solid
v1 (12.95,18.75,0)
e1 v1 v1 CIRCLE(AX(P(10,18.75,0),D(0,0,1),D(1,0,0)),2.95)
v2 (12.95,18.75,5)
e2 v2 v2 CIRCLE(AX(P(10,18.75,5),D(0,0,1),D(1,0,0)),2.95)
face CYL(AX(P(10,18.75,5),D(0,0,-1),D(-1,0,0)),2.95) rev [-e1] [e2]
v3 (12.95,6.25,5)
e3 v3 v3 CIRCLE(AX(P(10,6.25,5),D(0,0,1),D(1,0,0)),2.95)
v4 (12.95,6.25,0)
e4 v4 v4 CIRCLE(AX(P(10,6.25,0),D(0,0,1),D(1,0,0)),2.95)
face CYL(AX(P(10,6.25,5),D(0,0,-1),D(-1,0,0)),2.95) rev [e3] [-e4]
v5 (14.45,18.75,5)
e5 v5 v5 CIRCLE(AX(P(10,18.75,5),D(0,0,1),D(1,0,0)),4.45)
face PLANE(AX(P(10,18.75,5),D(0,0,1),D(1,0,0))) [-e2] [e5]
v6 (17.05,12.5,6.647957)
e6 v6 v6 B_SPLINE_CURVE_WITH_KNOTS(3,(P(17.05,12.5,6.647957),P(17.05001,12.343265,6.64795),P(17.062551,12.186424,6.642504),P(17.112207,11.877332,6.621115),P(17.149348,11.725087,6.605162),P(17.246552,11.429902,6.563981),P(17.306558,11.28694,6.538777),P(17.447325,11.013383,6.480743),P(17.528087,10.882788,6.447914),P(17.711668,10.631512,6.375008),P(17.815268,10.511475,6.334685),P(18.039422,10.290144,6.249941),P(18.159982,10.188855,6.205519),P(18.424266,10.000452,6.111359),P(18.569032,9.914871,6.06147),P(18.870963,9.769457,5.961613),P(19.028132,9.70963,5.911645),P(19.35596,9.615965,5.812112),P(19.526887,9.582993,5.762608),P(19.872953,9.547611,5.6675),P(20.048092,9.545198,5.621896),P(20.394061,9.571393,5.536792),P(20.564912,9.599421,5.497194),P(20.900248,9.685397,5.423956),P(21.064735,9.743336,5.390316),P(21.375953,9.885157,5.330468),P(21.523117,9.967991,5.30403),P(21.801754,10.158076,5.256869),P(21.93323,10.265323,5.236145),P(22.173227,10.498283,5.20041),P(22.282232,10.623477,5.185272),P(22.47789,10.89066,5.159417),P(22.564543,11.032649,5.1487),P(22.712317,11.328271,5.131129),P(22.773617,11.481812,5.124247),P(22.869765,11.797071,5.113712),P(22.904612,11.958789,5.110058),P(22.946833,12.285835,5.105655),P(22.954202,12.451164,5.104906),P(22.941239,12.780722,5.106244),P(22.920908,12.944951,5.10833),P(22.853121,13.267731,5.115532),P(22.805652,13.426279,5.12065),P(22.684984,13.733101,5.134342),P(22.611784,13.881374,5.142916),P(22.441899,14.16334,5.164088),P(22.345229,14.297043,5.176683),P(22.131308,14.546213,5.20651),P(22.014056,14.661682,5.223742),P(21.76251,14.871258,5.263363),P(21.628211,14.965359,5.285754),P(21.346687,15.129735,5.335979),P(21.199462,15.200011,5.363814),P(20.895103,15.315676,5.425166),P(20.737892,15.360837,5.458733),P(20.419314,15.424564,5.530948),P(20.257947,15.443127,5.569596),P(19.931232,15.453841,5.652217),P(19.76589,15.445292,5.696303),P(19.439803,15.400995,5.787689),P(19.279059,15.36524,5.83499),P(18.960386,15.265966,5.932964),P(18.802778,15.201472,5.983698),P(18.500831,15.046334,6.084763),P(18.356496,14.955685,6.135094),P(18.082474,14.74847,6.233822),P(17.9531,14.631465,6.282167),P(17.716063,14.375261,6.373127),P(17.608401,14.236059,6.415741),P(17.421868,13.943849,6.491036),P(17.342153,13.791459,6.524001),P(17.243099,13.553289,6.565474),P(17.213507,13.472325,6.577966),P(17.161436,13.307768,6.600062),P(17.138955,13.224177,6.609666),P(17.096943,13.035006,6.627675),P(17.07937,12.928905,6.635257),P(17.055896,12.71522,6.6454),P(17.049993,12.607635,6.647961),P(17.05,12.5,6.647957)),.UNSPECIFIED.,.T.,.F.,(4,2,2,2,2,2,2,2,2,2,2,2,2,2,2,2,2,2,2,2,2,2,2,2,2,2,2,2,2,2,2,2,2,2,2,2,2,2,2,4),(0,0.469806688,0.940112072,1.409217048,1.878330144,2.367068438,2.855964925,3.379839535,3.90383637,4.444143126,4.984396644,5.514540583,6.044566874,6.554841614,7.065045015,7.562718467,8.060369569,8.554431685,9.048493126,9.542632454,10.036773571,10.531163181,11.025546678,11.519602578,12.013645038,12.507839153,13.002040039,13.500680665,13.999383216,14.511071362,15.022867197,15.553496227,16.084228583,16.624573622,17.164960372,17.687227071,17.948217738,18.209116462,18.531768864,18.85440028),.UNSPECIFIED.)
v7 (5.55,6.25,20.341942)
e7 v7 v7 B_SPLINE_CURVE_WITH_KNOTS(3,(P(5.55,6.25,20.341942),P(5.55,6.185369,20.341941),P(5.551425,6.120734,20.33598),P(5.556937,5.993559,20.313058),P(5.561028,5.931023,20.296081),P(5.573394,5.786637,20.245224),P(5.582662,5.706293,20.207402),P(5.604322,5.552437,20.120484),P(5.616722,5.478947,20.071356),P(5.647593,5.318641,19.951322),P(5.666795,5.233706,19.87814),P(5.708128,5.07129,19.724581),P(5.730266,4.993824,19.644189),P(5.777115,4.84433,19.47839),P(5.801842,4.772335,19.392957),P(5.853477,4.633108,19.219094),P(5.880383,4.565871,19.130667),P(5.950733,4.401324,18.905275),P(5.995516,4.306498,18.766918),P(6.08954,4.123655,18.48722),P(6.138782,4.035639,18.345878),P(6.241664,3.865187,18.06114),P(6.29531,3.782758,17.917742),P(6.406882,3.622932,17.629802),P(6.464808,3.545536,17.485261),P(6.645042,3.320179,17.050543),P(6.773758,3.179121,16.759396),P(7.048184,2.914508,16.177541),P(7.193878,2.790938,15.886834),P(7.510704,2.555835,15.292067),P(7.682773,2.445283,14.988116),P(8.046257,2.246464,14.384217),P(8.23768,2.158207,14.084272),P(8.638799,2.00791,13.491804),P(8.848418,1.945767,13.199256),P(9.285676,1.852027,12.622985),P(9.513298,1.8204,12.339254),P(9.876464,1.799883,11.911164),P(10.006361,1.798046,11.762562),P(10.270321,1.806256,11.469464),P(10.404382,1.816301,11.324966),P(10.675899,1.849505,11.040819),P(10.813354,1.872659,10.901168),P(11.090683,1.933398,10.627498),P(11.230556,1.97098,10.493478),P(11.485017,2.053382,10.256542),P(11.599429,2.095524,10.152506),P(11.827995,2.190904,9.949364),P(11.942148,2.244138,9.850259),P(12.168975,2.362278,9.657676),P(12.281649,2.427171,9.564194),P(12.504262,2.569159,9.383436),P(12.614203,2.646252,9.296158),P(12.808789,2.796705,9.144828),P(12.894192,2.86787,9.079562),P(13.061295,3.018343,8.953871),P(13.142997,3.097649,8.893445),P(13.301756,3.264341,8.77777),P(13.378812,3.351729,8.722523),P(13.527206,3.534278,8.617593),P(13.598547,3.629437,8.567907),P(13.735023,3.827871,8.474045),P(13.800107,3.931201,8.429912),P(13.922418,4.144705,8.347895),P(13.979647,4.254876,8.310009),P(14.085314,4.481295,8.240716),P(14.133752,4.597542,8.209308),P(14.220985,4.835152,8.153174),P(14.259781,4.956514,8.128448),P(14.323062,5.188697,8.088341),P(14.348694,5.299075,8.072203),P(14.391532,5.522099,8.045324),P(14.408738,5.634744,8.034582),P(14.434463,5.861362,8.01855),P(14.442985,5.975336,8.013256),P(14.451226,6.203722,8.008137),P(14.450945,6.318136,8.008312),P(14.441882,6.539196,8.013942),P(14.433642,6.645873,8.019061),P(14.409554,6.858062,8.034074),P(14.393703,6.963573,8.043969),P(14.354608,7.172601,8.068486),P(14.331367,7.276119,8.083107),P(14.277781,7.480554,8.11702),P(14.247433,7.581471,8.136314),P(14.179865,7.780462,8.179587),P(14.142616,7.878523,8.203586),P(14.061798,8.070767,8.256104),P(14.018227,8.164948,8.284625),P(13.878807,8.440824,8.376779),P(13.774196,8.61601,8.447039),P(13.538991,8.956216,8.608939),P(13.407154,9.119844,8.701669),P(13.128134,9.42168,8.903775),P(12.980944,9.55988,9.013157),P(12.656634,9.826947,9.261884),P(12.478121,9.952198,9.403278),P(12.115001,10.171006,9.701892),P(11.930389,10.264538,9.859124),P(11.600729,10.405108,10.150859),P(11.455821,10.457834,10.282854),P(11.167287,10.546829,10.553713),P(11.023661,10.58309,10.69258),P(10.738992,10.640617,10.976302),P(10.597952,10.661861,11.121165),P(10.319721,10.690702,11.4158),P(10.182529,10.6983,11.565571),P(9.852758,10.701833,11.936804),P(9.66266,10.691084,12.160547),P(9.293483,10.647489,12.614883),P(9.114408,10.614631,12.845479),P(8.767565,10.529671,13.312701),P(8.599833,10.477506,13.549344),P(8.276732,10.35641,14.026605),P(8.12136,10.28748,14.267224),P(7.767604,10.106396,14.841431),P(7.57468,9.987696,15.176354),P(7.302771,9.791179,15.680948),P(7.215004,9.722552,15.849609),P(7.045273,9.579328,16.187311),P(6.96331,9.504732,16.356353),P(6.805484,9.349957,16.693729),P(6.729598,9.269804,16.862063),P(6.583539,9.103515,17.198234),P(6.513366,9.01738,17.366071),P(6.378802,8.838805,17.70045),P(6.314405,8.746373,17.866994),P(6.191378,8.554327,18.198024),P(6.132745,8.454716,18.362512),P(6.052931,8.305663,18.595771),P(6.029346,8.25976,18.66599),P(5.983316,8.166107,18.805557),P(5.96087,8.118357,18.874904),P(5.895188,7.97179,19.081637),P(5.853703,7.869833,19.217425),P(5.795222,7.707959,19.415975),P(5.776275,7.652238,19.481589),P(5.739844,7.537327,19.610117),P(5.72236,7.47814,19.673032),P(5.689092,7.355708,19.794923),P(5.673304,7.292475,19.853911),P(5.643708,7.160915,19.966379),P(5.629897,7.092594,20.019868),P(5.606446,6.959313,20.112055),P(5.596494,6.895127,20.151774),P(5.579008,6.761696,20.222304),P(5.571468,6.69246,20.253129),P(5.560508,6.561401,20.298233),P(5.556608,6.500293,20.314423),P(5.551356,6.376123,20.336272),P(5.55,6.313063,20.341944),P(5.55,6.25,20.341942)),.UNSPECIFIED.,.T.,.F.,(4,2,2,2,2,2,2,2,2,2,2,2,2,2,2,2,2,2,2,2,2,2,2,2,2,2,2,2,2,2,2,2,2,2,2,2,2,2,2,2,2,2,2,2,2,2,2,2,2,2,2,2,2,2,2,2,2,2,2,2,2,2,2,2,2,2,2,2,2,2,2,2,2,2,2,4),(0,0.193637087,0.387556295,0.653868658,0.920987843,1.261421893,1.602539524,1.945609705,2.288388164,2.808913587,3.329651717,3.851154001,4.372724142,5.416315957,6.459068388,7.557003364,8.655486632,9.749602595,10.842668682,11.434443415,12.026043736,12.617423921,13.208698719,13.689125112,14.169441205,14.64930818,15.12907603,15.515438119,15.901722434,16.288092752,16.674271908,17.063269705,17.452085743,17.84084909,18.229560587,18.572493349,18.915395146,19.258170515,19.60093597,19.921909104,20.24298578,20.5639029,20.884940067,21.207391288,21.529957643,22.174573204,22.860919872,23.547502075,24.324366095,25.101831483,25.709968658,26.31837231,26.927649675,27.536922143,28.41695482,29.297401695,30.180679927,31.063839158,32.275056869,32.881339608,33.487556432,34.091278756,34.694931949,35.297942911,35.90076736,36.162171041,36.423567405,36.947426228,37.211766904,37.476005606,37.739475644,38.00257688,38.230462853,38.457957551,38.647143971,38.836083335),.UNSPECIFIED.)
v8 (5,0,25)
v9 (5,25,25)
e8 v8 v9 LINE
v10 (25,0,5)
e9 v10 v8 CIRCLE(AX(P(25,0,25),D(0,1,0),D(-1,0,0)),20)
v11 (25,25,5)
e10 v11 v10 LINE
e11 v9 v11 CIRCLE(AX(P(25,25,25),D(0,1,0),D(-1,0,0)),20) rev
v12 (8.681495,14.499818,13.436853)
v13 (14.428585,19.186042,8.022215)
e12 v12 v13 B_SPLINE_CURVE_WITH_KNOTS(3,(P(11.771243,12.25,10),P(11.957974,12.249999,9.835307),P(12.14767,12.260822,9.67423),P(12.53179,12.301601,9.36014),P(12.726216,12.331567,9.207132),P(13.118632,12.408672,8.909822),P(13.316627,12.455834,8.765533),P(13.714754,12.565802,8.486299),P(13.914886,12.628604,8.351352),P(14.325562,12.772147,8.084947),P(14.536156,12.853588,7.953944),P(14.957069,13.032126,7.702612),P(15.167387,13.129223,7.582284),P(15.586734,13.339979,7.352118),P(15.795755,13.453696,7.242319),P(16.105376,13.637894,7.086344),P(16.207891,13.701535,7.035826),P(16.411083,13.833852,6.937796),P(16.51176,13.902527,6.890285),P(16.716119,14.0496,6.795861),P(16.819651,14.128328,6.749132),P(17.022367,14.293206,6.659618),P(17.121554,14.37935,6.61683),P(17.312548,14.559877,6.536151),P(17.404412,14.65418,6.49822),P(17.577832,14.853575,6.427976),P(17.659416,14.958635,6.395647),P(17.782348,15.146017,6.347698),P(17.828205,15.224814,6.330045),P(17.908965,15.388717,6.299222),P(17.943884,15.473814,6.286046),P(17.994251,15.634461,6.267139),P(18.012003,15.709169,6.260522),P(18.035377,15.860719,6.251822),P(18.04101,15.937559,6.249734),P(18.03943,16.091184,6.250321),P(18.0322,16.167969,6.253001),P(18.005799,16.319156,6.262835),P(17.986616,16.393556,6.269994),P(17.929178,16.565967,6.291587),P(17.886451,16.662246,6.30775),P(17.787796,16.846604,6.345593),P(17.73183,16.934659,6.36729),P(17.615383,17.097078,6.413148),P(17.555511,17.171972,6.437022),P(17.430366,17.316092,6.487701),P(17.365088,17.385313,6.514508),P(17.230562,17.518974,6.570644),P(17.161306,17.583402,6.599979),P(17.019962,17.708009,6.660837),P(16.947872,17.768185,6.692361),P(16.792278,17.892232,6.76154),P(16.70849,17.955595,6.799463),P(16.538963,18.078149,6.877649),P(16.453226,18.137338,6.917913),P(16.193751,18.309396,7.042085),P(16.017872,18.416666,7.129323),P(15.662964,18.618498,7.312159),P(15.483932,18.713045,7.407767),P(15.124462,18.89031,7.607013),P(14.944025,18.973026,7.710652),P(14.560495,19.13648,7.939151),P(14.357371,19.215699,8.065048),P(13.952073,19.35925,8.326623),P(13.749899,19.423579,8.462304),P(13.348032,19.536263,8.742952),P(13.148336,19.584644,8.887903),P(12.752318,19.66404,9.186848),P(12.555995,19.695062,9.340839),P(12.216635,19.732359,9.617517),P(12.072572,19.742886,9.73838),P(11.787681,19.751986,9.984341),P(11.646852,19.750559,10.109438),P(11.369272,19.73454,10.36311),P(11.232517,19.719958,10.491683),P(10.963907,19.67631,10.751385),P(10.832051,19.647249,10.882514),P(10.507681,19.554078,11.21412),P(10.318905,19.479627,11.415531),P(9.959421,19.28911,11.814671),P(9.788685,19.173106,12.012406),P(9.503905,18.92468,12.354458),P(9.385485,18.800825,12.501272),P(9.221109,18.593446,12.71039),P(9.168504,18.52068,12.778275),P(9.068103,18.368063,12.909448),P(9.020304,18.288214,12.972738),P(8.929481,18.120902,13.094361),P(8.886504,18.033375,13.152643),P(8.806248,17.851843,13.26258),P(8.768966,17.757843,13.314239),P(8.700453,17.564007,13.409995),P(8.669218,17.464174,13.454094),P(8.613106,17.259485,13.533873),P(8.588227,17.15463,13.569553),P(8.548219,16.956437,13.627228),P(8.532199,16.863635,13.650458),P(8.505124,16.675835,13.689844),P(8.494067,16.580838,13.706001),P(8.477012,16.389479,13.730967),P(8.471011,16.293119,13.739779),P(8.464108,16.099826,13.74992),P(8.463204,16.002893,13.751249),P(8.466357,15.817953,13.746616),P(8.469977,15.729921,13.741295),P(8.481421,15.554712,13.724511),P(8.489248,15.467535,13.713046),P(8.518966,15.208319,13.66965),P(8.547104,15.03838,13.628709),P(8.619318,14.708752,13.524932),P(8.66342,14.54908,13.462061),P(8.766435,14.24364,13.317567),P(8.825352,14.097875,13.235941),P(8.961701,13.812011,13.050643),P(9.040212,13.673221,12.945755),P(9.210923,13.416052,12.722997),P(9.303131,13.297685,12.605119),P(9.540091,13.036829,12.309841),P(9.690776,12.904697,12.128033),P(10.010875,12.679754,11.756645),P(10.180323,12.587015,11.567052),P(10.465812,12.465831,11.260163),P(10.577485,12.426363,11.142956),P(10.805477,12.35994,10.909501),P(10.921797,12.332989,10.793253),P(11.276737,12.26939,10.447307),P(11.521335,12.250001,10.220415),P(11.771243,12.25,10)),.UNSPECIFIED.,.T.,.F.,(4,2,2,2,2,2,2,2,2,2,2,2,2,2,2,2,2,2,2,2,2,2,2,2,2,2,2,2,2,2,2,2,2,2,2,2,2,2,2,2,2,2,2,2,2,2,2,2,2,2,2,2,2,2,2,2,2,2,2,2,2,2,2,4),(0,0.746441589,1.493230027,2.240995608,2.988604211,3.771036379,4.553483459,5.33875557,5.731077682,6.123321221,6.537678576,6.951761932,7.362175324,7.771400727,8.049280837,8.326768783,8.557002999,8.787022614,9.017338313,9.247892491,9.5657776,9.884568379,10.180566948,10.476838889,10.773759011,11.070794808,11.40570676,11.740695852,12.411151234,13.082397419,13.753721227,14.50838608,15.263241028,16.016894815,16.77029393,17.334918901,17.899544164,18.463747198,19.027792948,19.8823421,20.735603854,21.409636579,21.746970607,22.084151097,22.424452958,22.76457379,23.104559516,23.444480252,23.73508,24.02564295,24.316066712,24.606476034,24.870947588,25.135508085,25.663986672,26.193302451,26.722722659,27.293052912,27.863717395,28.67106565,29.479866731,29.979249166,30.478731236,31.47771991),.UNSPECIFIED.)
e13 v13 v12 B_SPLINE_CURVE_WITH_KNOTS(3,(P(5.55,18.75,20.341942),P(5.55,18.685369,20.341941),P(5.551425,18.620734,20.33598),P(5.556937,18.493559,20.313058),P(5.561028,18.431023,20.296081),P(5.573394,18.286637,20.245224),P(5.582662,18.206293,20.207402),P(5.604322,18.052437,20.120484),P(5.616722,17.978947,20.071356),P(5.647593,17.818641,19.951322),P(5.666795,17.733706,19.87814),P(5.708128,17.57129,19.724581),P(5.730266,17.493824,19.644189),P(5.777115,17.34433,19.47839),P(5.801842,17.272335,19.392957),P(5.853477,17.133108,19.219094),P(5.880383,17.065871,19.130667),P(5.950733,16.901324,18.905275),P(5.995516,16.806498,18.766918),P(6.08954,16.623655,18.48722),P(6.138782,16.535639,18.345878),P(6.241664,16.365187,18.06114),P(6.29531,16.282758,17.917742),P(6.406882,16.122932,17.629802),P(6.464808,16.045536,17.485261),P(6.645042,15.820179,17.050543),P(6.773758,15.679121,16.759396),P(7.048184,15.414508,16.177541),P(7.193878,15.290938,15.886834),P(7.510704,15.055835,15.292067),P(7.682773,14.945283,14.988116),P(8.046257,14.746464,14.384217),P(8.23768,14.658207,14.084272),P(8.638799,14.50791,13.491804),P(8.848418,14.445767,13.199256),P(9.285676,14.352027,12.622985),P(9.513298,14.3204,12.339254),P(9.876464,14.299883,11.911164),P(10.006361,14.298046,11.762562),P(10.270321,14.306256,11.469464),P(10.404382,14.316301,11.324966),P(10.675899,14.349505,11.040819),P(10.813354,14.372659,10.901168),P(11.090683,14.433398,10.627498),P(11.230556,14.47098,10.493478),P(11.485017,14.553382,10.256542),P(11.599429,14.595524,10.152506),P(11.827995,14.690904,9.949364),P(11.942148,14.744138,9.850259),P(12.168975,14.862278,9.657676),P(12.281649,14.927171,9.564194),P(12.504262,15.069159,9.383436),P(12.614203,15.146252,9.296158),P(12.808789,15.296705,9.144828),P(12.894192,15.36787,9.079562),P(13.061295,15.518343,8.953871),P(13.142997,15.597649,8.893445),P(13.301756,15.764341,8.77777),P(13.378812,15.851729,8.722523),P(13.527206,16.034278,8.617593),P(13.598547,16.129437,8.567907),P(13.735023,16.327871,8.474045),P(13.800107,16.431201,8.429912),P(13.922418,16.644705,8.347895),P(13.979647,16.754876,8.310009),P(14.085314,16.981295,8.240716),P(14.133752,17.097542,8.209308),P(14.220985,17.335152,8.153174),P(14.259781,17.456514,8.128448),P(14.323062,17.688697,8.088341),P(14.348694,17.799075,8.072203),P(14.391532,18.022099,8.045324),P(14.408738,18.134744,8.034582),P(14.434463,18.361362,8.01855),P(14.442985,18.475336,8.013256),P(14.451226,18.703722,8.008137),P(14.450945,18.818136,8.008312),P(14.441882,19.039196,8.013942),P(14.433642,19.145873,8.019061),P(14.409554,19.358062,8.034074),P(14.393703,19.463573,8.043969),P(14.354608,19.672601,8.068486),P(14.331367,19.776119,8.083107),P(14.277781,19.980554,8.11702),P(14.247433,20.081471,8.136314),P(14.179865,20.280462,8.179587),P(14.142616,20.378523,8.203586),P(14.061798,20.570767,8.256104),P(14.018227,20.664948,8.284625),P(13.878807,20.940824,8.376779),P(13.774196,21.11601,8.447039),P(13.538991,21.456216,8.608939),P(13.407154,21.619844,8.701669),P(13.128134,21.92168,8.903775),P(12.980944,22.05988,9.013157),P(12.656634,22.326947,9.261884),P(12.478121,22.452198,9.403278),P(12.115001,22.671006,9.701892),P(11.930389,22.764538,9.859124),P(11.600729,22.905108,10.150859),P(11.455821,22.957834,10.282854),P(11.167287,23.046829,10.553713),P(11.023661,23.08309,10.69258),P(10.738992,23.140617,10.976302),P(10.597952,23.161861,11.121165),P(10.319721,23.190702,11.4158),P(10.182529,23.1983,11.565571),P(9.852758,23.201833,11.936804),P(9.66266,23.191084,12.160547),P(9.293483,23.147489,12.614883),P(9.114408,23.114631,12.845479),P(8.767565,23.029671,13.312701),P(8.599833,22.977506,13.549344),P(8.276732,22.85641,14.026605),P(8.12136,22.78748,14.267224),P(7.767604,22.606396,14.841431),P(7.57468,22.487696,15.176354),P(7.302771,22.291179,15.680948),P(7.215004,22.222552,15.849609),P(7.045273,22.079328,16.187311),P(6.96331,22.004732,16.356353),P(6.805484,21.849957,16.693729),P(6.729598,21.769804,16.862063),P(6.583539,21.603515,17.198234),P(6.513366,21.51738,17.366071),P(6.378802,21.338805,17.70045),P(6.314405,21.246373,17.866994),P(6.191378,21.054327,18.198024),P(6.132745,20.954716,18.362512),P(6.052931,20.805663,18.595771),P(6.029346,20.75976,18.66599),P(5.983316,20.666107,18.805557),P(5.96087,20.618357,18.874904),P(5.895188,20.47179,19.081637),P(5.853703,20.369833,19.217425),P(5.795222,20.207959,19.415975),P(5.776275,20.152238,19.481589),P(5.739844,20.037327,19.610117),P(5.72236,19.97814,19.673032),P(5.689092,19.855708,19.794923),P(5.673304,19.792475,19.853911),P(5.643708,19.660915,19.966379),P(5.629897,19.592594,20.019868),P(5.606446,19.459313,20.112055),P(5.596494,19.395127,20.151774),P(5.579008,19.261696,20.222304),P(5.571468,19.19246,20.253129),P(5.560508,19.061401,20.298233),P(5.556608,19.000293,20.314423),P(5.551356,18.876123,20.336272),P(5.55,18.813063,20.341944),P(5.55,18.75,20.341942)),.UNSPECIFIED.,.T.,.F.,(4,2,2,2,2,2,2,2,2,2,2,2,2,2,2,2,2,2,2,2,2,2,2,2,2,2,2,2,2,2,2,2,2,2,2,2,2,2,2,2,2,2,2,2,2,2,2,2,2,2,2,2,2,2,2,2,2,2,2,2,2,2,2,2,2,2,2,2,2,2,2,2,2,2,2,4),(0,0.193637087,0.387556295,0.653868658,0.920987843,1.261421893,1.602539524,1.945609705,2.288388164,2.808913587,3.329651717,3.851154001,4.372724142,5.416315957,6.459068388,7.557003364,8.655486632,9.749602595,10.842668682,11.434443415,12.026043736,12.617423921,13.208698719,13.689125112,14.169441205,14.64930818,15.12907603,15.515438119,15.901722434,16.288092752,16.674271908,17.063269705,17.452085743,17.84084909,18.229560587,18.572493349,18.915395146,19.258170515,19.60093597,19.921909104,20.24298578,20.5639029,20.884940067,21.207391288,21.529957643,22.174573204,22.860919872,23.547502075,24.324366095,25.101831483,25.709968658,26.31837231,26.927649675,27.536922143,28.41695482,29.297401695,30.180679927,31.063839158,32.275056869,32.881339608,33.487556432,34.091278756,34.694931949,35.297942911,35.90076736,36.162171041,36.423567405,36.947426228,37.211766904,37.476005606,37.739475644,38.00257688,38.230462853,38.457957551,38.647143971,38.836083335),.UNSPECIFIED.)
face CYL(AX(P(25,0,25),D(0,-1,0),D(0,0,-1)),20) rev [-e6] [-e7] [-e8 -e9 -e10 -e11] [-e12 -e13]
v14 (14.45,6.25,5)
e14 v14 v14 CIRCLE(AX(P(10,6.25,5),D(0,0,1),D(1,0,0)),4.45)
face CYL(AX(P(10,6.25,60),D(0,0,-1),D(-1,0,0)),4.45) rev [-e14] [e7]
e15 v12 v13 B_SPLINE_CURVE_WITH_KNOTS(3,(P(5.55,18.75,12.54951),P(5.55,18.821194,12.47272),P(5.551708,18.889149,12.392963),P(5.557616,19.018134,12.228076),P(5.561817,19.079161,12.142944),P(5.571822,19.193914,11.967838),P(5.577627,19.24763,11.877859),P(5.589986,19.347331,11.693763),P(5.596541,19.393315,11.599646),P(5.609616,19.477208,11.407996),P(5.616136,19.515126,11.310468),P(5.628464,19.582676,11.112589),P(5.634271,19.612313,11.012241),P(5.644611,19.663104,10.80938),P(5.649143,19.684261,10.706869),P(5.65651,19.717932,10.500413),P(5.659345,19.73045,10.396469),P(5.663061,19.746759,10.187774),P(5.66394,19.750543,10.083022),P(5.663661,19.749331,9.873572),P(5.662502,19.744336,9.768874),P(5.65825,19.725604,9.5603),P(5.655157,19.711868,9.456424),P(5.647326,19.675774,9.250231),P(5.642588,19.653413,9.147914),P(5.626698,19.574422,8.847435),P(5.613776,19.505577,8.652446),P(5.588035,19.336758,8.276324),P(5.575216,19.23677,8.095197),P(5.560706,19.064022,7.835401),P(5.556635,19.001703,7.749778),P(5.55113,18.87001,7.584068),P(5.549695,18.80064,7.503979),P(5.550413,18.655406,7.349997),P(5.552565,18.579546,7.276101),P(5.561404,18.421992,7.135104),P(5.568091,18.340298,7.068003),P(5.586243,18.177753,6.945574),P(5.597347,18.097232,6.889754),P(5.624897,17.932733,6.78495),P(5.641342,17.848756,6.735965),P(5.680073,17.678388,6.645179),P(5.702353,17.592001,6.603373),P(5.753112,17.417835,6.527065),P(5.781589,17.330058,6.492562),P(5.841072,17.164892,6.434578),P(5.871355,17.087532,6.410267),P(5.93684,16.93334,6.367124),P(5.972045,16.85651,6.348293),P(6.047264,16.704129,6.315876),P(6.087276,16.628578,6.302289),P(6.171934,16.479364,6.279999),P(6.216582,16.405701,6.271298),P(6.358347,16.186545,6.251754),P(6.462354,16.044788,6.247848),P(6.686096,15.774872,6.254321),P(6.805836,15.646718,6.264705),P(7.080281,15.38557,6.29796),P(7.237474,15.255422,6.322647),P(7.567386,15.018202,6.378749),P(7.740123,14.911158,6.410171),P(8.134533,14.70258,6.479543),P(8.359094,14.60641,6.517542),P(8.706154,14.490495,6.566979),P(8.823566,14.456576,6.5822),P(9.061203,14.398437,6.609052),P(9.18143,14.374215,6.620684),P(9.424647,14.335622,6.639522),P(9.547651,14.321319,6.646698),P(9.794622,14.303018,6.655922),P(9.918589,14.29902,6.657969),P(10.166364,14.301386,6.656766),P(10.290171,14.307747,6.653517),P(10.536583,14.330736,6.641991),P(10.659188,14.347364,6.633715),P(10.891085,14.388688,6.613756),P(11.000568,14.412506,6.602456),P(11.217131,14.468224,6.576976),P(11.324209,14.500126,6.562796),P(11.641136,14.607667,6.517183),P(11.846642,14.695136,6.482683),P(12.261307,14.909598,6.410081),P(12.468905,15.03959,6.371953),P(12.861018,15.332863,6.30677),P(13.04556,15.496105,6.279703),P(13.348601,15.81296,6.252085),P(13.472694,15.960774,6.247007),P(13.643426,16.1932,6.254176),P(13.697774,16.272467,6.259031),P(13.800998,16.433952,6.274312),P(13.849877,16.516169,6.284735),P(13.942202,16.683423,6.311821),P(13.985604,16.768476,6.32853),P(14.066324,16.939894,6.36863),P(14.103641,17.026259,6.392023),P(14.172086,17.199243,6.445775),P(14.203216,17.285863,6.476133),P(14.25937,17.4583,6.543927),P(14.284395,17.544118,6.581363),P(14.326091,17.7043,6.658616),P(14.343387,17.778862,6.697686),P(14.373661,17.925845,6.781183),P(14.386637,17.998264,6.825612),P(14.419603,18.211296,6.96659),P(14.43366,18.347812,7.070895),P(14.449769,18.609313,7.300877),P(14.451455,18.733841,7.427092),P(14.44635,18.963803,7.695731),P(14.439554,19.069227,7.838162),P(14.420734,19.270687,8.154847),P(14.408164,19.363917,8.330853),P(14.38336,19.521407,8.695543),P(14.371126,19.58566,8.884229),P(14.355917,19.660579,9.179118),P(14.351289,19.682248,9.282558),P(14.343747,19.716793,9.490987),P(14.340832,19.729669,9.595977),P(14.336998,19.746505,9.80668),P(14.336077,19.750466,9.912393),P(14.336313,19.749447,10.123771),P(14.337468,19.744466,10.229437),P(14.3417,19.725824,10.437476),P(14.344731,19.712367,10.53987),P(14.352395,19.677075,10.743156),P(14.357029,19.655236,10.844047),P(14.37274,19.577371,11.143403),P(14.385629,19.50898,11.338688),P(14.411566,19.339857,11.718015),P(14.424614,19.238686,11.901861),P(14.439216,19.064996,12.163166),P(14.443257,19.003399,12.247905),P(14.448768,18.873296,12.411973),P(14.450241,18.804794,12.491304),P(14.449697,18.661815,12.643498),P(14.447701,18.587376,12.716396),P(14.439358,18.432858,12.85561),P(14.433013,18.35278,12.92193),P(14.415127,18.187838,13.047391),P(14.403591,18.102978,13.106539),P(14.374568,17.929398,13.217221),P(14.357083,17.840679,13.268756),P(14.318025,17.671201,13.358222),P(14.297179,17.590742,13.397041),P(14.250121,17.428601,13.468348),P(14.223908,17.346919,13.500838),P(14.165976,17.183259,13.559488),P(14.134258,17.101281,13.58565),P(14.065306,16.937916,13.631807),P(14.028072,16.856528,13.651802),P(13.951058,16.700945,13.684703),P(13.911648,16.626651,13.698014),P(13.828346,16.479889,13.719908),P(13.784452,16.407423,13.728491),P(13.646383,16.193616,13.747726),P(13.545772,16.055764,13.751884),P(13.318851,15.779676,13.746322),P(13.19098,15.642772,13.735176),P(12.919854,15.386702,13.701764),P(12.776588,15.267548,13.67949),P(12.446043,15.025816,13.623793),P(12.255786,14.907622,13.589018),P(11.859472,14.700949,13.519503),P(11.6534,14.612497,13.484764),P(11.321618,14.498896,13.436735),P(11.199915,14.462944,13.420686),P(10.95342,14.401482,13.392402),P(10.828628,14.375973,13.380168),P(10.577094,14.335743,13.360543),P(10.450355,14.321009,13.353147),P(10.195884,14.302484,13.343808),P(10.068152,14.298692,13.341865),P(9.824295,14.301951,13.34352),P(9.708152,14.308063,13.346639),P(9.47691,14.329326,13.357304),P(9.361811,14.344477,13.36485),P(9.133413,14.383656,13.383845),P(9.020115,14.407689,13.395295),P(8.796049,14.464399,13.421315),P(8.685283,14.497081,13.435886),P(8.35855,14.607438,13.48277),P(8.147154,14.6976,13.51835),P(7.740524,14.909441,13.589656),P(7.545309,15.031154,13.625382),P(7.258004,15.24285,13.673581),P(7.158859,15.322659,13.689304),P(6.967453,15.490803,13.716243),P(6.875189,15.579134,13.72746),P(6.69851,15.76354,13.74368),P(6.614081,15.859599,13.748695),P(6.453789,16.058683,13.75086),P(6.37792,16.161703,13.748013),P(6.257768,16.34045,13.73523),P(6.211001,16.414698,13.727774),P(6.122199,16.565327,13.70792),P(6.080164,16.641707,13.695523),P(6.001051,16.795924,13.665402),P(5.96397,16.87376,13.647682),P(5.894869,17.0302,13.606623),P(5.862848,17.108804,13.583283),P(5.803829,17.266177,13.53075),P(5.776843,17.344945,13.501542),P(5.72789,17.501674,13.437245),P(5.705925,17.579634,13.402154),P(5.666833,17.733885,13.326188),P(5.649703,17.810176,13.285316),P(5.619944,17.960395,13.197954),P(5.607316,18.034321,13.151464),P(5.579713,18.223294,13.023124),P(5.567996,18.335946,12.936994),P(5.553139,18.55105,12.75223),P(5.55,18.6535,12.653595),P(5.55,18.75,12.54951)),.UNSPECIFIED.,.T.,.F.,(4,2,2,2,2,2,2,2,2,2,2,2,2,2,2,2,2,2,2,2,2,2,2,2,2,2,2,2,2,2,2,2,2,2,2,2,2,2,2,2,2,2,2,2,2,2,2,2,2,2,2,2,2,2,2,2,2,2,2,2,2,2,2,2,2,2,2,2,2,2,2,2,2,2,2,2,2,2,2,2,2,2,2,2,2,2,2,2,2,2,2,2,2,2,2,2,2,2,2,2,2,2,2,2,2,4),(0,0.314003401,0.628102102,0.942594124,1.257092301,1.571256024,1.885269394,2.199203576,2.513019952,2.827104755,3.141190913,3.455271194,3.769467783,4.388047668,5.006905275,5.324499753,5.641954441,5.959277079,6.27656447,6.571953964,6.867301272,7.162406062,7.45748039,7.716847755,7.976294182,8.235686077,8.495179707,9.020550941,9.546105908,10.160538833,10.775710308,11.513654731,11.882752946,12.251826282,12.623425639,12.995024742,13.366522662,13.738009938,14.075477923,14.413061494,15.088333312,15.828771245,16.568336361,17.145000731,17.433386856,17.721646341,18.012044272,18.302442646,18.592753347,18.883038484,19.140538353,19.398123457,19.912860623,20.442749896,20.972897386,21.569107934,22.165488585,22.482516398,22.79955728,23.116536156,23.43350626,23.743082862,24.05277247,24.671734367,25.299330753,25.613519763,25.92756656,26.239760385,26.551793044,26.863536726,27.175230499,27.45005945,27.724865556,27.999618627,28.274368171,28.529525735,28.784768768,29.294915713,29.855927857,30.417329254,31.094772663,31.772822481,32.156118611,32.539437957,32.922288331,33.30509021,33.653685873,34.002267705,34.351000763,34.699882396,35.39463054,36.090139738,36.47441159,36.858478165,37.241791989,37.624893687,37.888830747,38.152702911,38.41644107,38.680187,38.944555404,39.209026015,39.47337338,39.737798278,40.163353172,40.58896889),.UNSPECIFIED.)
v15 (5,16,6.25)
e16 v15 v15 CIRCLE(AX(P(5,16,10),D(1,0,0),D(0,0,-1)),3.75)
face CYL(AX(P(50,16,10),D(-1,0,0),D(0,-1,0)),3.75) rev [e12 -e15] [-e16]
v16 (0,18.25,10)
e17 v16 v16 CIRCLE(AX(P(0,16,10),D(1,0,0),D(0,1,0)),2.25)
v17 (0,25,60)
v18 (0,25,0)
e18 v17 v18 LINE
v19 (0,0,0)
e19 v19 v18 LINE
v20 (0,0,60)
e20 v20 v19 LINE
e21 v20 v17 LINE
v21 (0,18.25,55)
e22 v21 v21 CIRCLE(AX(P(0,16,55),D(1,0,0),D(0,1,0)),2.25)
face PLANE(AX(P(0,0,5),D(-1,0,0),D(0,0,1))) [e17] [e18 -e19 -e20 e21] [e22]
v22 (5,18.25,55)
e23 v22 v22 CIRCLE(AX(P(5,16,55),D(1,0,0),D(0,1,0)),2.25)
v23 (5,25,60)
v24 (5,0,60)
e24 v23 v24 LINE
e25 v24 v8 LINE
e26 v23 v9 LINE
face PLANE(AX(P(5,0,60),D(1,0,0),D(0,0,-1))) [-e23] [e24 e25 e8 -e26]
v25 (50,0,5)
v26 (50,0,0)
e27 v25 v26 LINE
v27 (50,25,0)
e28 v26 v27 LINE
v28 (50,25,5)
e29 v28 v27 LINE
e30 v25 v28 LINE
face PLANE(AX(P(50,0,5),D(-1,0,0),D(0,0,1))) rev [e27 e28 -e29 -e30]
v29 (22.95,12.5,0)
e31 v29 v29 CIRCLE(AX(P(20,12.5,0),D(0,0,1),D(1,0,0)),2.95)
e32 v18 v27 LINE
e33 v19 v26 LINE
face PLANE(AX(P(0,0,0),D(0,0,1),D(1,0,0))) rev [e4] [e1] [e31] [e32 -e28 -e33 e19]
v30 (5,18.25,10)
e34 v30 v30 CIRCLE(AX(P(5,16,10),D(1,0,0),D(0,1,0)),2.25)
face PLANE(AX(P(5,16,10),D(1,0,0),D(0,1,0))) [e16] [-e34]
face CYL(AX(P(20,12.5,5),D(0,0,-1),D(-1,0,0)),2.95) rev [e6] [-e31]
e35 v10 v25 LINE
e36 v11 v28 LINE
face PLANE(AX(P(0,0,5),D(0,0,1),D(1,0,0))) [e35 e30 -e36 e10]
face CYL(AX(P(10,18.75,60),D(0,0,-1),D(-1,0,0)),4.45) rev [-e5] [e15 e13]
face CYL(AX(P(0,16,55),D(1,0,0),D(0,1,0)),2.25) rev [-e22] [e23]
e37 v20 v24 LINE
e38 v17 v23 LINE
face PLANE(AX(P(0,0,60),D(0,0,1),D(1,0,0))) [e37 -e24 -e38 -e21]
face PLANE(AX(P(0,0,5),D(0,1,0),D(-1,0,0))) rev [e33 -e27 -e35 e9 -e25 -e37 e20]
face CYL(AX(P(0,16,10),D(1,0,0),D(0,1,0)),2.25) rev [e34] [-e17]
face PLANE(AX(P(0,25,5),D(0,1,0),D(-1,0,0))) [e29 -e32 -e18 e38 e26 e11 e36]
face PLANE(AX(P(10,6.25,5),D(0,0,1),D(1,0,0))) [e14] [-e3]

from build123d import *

# Parameters (mm, degrees)
CROQUIS1_W                   = 50
CROQUIS1_H                   = 25
CROQUIS1_R                   = 2.95
SALIENTE_EXTRUIR1_DEPTH      = 5
CROQUIS1_3_W                 = 5
CROQUIS1_3_H                 = 25
SALIENTE_EXTRUIR2_DEPTH      = 60
REDONDEO2_DEPTH              = 25
REDONDEO2_START              = 5
REDONDEO2_2_OUTLINE_R        = 2.95
REDONDEO2_2_DEPTH            = 20
CROQUIS4_R                   = 4.45
CORTAR_EXTRUIR1_DEPTH        = 79.421935739
CROQUIS5_R                   = 2.25
CORTAR_EXTRUIR2_DEPTH        = 80.056941536
CROQUIS5_3_R                 = 3.75
CROQUIS5_3_R_2               = 2.25
CORTAR_EXTRUIR_L_MINA3_DEPTH = 80.056941536


with BuildPart() as part:
    # Croquis1 → Saliente-Extruir1 (new body)
    with BuildSketch(Plane.XY):
        with Locations((25, 12.5)):
            Rectangle(CROQUIS1_W, CROQUIS1_H)
        with Locations((10, 18.75)):
            Circle(CROQUIS1_R, mode=Mode.SUBTRACT)
        with Locations((10, 6.25)):
            Circle(CROQUIS1_R, mode=Mode.SUBTRACT)
        with Locations((20, 12.5)):
            Circle(CROQUIS1_R, mode=Mode.SUBTRACT)
    extrude(amount=SALIENTE_EXTRUIR1_DEPTH)

    # Croquis1<3> → Saliente-Extruir2 (add)
    with BuildSketch(Plane.XY):
        with Locations((2.5, 12.5)):
            Rectangle(CROQUIS1_3_W, CROQUIS1_3_H)
    extrude(amount=SALIENTE_EXTRUIR2_DEPTH)

    # Redondeo2: read off the stored shape, not the designer's step
    # Redondeo2 outline → Redondeo2 (add)
    with BuildSketch(Plane(origin=(0, 0, 0), x_dir=(1, 0, 0), z_dir=(0, 1, 0))):
        with BuildLine():
            Line((5, -5), (5, -25))
            ThreePointArc((5, -25), (10.857864376, -10.857864376), (25, -5))
            Line((25, -5), (5, -5))
        make_face()
    extrude(amount=REDONDEO2_DEPTH)

    # Redondeo2 2 outline → Redondeo2 2 (cut)
    with BuildSketch(Plane.XY.offset(REDONDEO2_START)):
        with Locations((10, 18.75)):
            Circle(REDONDEO2_2_OUTLINE_R)
        with Locations((20, 12.5)):
            Circle(REDONDEO2_2_OUTLINE_R)
        with Locations((10, 6.25)):
            Circle(REDONDEO2_2_OUTLINE_R)
    extrude(amount=REDONDEO2_2_DEPTH, mode=Mode.SUBTRACT)

    # Croquis4 → Cortar-Extruir1 (cut, through all)
    with BuildSketch(Plane.XY.offset(5)):
        with Locations(Location((10, 18.75, 0), (0, 0, 180))):
            Circle(CROQUIS4_R)
        with Locations(Location((10, 6.25, 0), (0, 0, 180))):
            Circle(CROQUIS4_R)
    extrude(amount=CORTAR_EXTRUIR1_DEPTH, mode=Mode.SUBTRACT)

    # Croquis5 → Cortar-Extruir2 (cut, through all)
    with BuildSketch(Plane(origin=(5, 0, 0), x_dir=(0, 0, -1), z_dir=(1, 0, 0))):
        with Locations(Location((-55, 16, 0), (0, 0, 90))):
            Circle(CROQUIS5_R)
        with Locations(Location((-10, 16, 0), (0, 0, 90))):
            Circle(CROQUIS5_R)
    extrude(amount=-CORTAR_EXTRUIR2_DEPTH, mode=Mode.SUBTRACT)

    # Croquis5<3> → Cortar-Extruir-Lámina3 (cut, through all)
    with BuildSketch(Plane(origin=(5, 0, 0), x_dir=(0, 0, -1), z_dir=(1, 0, 0))):
        with Locations((-10, 16)):
            Circle(CROQUIS5_3_R)
        with Locations((-10, 16)):
            Circle(CROQUIS5_3_R_2, mode=Mode.SUBTRACT)
    extrude(amount=CORTAR_EXTRUIR_L_MINA3_DEPTH, mode=Mode.SUBTRACT)


with BuildPart() as cortar_extruir_l_mina3_kept_piece:
    # of the separate pieces the step leaves, the one the design keeps (cortar_extruir_l_mina3_pieces_kept)
    add(part.part.solids().sort_by_distance((0, 0, 0))[0])


solid = cortar_extruir_l_mina3_kept_piece.part
